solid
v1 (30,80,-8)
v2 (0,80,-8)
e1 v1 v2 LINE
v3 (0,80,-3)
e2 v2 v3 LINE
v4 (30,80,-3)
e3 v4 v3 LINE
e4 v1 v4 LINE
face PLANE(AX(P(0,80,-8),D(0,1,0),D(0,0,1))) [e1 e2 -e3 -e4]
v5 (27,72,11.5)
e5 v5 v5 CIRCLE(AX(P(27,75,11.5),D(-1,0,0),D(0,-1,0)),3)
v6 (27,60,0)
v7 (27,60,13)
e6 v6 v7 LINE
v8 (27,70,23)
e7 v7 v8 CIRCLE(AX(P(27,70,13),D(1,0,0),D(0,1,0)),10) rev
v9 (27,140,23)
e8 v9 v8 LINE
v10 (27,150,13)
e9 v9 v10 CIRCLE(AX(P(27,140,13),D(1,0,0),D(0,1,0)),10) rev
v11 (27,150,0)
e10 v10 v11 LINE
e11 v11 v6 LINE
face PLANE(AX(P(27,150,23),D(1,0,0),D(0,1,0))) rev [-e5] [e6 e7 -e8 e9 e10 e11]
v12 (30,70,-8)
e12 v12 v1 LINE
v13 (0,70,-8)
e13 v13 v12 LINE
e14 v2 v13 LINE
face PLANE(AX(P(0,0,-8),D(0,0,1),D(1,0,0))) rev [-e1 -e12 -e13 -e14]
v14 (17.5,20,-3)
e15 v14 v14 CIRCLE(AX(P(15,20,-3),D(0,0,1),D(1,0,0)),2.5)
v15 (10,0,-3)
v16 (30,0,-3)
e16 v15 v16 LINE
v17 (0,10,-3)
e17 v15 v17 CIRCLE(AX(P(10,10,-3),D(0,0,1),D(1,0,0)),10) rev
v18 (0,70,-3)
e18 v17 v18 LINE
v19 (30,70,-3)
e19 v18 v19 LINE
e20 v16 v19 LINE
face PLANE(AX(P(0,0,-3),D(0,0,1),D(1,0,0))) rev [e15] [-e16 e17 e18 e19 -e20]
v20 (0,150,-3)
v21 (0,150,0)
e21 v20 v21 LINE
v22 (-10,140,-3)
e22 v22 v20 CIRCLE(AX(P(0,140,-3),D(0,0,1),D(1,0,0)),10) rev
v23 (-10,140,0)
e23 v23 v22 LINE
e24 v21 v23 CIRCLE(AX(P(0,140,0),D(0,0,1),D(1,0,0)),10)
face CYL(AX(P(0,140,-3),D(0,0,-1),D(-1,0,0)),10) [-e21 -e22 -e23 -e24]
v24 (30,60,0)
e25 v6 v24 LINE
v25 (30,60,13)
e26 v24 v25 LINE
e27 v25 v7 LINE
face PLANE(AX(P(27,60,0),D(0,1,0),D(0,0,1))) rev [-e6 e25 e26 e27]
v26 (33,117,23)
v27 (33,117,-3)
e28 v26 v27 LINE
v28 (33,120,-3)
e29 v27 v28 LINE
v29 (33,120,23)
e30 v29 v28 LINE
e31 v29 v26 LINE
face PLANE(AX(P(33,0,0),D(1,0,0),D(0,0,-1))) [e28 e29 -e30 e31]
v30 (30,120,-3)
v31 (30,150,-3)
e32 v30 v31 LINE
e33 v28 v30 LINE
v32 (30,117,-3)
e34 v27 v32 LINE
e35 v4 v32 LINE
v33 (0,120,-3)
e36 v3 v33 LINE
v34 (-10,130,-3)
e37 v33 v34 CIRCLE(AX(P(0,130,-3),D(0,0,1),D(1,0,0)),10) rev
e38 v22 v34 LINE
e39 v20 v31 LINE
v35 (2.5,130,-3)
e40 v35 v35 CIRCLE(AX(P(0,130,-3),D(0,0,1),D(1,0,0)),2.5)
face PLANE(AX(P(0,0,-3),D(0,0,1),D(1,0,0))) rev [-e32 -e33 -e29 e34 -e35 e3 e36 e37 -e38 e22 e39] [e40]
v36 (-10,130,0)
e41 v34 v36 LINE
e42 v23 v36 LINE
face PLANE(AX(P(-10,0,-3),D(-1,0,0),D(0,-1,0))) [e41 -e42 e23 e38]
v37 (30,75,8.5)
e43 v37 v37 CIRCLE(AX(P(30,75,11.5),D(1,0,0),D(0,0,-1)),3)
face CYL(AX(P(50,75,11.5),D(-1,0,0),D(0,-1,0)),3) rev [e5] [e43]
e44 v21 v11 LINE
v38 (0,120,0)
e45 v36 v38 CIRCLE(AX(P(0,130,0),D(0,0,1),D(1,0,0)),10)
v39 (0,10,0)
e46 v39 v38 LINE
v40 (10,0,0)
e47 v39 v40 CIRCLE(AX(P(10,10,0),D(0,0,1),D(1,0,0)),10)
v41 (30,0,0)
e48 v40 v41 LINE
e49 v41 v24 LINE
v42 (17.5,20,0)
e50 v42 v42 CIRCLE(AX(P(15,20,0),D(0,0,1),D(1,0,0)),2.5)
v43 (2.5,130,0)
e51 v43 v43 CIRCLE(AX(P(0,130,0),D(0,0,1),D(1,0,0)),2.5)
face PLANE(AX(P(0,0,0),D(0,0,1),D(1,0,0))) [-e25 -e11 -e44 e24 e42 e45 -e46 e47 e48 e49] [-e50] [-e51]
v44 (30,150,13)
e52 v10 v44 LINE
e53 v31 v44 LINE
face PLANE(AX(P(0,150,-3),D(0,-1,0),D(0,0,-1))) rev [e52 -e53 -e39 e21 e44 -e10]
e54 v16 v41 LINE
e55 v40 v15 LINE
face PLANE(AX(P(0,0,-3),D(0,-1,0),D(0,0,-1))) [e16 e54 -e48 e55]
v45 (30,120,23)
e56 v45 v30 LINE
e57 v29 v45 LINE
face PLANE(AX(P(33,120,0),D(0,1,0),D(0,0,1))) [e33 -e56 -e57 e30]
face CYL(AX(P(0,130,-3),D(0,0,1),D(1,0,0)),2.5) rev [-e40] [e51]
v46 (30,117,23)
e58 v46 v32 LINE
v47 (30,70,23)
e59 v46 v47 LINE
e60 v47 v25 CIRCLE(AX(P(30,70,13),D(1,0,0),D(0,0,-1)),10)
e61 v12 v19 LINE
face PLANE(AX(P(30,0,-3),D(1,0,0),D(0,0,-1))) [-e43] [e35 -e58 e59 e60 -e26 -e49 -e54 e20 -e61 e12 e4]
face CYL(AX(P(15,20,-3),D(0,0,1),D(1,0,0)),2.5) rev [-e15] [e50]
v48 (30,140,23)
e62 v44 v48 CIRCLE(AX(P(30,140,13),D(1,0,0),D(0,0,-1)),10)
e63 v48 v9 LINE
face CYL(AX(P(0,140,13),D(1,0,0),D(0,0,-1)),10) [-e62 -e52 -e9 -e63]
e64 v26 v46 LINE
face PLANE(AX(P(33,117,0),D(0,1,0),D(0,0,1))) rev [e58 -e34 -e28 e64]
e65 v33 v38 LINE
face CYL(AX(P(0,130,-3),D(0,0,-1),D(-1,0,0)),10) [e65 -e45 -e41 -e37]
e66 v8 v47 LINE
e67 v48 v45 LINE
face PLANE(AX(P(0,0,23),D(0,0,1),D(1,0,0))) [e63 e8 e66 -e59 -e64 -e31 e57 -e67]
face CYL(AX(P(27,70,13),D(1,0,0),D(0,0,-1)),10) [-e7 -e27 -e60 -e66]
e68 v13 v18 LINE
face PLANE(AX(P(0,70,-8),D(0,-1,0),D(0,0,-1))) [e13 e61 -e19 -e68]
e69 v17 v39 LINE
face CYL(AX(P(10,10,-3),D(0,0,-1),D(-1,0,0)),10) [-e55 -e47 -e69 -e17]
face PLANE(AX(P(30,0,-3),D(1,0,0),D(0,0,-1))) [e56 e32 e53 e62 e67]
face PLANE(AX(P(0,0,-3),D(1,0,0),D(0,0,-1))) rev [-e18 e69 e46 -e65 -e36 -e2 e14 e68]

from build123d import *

# Parameters (mm, degrees)
SKETCH1_R             = 2.5
BOSS_EXTRUDE1_DEPTH   = 3
SKETCH1_W             = 30
SKETCH1_H             = 70
BOSS_EXTRUDE1_2_DEPTH = 3
SKETCH3_W             = 30
SKETCH3_H             = 10
BOSS_EXTRUDE2_DEPTH   = 8
SKETCH4_W             = 3
SKETCH4_H             = 150
BOSS_EXTRUDE4_DEPTH   = 23
SKETCH5_R             = 3
CUT_EXTRUDE1_DEPTH    = 23
SKETCH6_W             = 26
SKETCH6_H             = 3
BOSS_EXTRUDE5_DEPTH   = 3
FILLET1_R             = 10
SKETCH7_W             = 36.729037069
SKETCH7_H             = 60
CUT_EXTRUDE2_DEPTH    = 3
FILLET2_R             = 10


with BuildPart() as part:
    # Sketch1 → Boss-Extrude1 (new body)
    with BuildSketch(Plane.XY):
        Polygon((30, 150), (0, 150), (-10, 150), (-10, 120), (0, 120), (0, 80), (30, 80), (30, 120), align=None)
        with Locations((0, 130)):
            Circle(SKETCH1_R, mode=Mode.SUBTRACT)
    extrude(amount=-BOSS_EXTRUDE1_DEPTH)



with BuildPart() as body_2:
    # Sketch1 → Boss-Extrude1 2 (new body)
    with BuildSketch(Plane.XY):
        with Locations((15, 35)):
            Rectangle(SKETCH1_W, SKETCH1_H)
        with Locations((15, 20)):
            Circle(SKETCH1_R, mode=Mode.SUBTRACT)
    extrude(amount=-BOSS_EXTRUDE1_2_DEPTH)


with BuildPart() as part_1:
    add(part.part)

    add(body_2.part)  # Boss-Extrude2 merges body 2
    # Sketch3 → Boss-Extrude2 (add)
    with BuildSketch(Plane.XY):
        with Locations((15, 75)):
            Rectangle(SKETCH3_W, SKETCH3_H)
    extrude(amount=-BOSS_EXTRUDE2_DEPTH)

    # Sketch4 → Boss-Extrude4 (add)
    with BuildSketch(Plane.XY):
        with Locations((28.5, 75)):
            Rectangle(SKETCH4_W, SKETCH4_H)
    extrude(amount=BOSS_EXTRUDE4_DEPTH)

    # Sketch5 → Cut-Extrude1 (cut)
    with BuildSketch(Plane.ZY.offset(-27)):
        with Locations(Location((11.5, 75, 0), (0, 0, 270))):
            Circle(SKETCH5_R)
    extrude(amount=-CUT_EXTRUDE1_DEPTH, mode=Mode.SUBTRACT)

    # Sketch6 → Boss-Extrude5 (add)
    with BuildSketch(Plane(origin=(30, 0, 0), x_dir=(0, 0, -1), z_dir=(1, 0, 0))):
        with Locations((-10, 118.5)):
            Rectangle(SKETCH6_W, SKETCH6_H)
    extrude(amount=BOSS_EXTRUDE5_DEPTH)

    # Fillet1
    fillet1_edges = [part_1.edges().sort_by_distance(p)[0] for p in [
        (0, 0, -1.5),
        (28.5, 0, 23),
        (28.5, 150, 23),
        (-10, 120, -1.5),
        (-10, 150, -1.5),
    ]]
    fillet(fillet1_edges, radius=FILLET1_R - 0.0001)  # a hair under: the kernel refuses the full size

    # Sketch7 → Cut-Extrude2 (cut)
    with BuildSketch(Plane(origin=(30, 0, 0), x_dir=(0, 0, -1), z_dir=(1, 0, 0))):
        with Locations((-18.364518535, 30)):
            Rectangle(SKETCH7_W, SKETCH7_H)
    extrude(amount=-CUT_EXTRUDE2_DEPTH, mode=Mode.SUBTRACT)

    # Fillet2
    fillet2_edges = [part_1.edges().sort_by_distance(p)[0] for p in [
        (28.5, 60, 23),
    ]]
    fillet(fillet2_edges, radius=FILLET2_R)


solid = part_1.part
